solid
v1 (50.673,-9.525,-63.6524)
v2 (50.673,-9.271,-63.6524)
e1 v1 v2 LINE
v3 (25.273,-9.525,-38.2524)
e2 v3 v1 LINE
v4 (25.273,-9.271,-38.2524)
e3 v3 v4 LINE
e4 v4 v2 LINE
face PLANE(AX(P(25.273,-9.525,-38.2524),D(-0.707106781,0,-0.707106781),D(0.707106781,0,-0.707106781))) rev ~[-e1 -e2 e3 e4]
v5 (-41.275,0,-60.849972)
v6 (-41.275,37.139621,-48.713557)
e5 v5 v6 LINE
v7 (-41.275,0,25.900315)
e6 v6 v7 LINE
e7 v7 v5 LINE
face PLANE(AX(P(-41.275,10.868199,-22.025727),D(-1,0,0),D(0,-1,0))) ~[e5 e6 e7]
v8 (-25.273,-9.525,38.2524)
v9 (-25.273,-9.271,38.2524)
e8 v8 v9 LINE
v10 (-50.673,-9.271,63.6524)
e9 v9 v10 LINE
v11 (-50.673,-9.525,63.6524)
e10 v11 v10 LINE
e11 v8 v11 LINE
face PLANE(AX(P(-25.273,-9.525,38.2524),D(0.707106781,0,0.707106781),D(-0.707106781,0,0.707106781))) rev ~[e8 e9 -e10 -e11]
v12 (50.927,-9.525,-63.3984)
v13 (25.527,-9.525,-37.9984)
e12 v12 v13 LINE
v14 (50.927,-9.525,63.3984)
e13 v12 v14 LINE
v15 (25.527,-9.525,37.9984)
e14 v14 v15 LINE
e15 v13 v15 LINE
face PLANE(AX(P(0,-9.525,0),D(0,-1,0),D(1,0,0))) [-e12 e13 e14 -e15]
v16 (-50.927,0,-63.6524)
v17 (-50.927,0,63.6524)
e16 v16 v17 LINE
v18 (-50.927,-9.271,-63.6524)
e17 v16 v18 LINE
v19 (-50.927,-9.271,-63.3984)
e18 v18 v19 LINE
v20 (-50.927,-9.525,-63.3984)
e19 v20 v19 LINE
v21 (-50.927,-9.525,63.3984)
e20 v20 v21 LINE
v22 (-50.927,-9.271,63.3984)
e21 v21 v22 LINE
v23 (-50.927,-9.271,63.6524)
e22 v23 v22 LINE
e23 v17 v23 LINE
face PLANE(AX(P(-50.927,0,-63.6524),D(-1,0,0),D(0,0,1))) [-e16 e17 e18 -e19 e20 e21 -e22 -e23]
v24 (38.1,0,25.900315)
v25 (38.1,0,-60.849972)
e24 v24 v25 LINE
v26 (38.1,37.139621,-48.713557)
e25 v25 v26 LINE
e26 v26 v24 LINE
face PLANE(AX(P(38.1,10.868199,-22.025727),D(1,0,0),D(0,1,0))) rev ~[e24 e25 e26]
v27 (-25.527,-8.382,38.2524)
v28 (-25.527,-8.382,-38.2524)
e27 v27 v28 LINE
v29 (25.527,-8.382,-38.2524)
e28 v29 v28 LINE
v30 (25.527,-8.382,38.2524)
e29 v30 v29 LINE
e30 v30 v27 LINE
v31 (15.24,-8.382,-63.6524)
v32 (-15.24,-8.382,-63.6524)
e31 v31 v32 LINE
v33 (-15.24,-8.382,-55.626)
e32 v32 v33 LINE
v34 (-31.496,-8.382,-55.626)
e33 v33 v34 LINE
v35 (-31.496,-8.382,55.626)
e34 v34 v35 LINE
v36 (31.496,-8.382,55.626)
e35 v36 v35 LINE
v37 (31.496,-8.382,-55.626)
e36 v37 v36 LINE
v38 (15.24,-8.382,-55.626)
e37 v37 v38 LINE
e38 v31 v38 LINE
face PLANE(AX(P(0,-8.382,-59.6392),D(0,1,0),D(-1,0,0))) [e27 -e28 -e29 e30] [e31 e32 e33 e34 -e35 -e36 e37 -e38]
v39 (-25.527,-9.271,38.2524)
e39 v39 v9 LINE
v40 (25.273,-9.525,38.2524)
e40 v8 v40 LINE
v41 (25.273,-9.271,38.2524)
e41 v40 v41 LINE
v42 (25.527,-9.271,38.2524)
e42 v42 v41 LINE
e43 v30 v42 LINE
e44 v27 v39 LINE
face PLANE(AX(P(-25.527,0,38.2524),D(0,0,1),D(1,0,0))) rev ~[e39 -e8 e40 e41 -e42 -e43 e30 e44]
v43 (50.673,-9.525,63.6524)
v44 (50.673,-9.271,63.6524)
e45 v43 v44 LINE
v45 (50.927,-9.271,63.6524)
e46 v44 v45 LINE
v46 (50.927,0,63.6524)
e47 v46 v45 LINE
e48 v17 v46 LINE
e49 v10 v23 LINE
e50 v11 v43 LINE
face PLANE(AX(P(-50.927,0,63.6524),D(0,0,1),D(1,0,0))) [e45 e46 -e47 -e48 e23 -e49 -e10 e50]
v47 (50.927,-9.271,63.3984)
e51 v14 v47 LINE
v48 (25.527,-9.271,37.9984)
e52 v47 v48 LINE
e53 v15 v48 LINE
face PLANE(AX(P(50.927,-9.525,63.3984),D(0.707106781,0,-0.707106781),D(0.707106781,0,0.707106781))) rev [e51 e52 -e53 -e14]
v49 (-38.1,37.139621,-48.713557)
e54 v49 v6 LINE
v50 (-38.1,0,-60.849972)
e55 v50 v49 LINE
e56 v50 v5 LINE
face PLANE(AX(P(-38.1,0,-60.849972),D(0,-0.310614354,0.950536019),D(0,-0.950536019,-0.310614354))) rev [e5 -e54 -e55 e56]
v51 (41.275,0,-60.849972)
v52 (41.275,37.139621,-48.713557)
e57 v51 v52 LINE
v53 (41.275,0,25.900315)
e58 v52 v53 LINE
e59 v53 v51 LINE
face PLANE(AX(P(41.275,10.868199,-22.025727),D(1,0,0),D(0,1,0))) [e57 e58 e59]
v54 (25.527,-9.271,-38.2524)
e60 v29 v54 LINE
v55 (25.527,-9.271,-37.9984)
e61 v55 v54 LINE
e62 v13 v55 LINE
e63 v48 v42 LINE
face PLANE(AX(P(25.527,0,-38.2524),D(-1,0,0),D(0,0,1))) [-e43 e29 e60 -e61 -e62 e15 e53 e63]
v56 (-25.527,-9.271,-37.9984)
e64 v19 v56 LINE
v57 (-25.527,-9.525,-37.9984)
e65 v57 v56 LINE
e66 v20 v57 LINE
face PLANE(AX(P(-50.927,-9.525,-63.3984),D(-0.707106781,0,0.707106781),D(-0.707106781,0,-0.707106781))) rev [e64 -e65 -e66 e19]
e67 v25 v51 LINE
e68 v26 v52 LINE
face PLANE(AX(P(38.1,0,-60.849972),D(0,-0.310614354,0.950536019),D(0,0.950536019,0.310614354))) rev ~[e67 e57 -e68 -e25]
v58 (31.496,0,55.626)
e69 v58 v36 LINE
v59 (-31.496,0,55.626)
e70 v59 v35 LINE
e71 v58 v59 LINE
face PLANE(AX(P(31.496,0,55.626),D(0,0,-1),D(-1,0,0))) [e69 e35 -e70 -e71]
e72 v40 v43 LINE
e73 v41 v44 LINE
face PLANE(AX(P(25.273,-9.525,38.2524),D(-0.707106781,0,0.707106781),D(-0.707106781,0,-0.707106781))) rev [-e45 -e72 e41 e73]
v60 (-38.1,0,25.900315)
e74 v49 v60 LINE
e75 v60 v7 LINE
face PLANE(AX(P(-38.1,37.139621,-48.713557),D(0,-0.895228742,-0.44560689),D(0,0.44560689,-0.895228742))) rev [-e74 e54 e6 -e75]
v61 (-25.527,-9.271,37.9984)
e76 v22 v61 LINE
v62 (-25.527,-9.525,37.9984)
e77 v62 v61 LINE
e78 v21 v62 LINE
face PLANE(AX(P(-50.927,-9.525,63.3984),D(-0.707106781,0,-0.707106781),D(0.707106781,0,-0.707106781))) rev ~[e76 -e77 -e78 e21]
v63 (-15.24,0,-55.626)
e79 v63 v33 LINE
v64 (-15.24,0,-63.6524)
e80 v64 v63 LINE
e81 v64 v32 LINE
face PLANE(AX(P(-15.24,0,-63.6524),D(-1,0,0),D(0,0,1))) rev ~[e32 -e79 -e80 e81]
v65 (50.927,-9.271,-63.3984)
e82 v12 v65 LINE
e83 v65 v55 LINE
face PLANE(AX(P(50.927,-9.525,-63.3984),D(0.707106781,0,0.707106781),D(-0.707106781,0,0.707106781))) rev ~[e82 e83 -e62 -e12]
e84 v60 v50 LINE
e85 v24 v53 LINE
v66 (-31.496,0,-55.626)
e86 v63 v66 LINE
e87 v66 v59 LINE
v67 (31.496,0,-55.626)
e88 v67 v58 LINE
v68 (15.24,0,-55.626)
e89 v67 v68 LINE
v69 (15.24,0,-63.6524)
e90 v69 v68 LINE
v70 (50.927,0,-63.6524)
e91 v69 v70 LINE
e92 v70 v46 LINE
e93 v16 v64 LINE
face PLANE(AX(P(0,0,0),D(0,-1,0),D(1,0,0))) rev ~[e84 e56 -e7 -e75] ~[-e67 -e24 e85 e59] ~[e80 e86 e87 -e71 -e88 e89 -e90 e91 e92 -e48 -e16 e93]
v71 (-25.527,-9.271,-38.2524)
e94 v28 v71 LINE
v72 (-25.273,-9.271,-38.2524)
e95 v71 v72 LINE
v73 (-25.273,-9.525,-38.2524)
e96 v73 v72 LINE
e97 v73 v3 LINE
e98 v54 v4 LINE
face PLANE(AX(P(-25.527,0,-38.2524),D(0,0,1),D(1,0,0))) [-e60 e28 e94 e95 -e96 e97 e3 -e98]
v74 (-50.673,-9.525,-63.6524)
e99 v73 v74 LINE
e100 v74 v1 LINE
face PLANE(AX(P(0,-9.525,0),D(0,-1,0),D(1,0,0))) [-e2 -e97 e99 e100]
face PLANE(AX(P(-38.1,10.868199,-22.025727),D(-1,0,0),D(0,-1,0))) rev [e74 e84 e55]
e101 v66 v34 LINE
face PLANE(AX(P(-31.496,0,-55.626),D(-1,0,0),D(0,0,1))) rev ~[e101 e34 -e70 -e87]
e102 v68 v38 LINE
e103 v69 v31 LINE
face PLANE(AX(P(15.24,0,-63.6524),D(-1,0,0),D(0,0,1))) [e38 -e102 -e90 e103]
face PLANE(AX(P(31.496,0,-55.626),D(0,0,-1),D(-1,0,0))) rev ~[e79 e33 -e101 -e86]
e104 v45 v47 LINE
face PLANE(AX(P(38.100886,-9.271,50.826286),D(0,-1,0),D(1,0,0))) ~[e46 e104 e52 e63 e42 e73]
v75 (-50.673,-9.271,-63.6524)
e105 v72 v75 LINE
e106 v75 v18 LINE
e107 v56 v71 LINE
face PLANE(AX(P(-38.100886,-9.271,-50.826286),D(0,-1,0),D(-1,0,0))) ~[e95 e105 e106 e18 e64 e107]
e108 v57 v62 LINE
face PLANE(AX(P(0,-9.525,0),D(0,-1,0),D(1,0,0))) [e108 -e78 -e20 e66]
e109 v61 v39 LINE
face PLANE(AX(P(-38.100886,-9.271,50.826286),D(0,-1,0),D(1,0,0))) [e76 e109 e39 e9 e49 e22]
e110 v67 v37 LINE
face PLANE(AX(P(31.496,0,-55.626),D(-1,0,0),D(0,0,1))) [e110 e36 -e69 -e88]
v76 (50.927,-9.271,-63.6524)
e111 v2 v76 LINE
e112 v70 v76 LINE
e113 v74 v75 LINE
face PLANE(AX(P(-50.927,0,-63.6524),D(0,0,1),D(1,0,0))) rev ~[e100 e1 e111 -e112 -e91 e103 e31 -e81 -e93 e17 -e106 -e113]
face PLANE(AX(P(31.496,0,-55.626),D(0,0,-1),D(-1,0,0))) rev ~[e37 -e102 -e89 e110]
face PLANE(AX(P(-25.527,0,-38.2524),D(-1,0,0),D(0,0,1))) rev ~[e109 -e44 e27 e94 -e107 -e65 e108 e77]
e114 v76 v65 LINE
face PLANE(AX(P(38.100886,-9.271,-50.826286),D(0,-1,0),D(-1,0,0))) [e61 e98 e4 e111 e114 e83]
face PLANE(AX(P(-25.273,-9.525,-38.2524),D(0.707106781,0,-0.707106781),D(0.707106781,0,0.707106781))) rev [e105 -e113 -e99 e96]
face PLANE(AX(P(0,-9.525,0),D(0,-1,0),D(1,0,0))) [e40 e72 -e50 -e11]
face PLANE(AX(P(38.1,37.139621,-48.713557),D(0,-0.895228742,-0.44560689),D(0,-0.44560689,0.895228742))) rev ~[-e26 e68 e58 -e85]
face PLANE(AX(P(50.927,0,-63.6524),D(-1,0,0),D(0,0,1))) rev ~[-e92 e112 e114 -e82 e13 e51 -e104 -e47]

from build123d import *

# Parameters (mm, degrees)
F2_W              = 101.854
F2_H              = 127.3048
F2_W_2            = 51.054
F2_H_2            = 76.5048
F3_DEPTH          = 9.525
F4_W              = 62.992
F4_H              = 111.252
F5_DEPTH          = 8.382
F8_DEPTH          = 3.175
F9_W              = 30.48
F9_H              = 8.0264
F10_DEPTH         = 8.382
F12_DEPTH         = 0.254
F12_COPIES2_COUNT = 2


# Not quite as in the source:
# - a pattern or mirror of a feature is missing from the dataset's text; its kind, count and spacing are read off the source's solid


with BuildPart() as f3:
    # F2 (on Front) → F3 (new body)
    with BuildSketch(Plane.XZ):
        Rectangle(F2_W, F2_H)
        Rectangle(F2_W_2, F2_H_2, mode=Mode.SUBTRACT)
    extrude(amount=F3_DEPTH)

    # F4 (on face) → F5 (cut)
    with BuildSketch(Plane(origin=(0, 0, 0), x_dir=(-1, 0, 0), z_dir=(0, 1, 0))):
        Rectangle(F4_W, F4_H)
    extrude(amount=-F5_DEPTH, mode=Mode.SUBTRACT)

    # F7 (on offset) → F8 (join)
    with BuildSketch(Plane.YZ.offset(38.1)):
        Polygon((37.1396206319, -48.7135574222), (0, 25.9003154933), (0, -60.8499720693), align=None)
    f8 = extrude(amount=F8_DEPTH)

    # F8_copies: F8 across plane
    add(f8.mirror(Plane(origin=(0, 0, 0), x_dir=(0, 0, -1), z_dir=(-1, 0, 0))))

    # F9 (on face) → F10 (cut, through all)
    with BuildSketch(Plane(origin=(0, 0, 0), x_dir=(-1, 0, 0), z_dir=(0, 1, 0))):
        with Locations((0, -59.6392)):
            Rectangle(F9_W, F9_H)
    extrude(amount=-F10_DEPTH, mode=Mode.SUBTRACT)

    # F11 (on face) → F12 (cut)
    with BuildSketch(Plane.XZ.offset(9.525)):
        Polygon((-50.927, 63.3984), (-25.527, 37.9984), (-25.527, 38.2524), (-25.273, 38.2524), (-50.673, 63.6524), (-50.927, 63.6524), align=None)
    f12 = extrude(amount=-F12_DEPTH, mode=Mode.SUBTRACT)

    # F12_copies: F12 across plane
    add(f12.mirror(Plane(origin=(0, 0, 0), x_dir=(0, 0, 1), z_dir=(1, 0, 0))), mode=Mode.SUBTRACT)

    # F12_copies1: F12 across plane
    add(f12.mirror(Plane(origin=(0, 0, 0), x_dir=(-1, 0, 0), z_dir=(0, 0, -1))), mode=Mode.SUBTRACT)

    # F12_copies2: F12 ×2 about axis
    f12_copies2_axis = Axis((0, 0, 0), (0, 1, 0))
    for i in range(1, F12_COPIES2_COUNT):
        add(f12.rotate(f12_copies2_axis, i * 360 / F12_COPIES2_COUNT), mode=Mode.SUBTRACT)


solid = f3.part
